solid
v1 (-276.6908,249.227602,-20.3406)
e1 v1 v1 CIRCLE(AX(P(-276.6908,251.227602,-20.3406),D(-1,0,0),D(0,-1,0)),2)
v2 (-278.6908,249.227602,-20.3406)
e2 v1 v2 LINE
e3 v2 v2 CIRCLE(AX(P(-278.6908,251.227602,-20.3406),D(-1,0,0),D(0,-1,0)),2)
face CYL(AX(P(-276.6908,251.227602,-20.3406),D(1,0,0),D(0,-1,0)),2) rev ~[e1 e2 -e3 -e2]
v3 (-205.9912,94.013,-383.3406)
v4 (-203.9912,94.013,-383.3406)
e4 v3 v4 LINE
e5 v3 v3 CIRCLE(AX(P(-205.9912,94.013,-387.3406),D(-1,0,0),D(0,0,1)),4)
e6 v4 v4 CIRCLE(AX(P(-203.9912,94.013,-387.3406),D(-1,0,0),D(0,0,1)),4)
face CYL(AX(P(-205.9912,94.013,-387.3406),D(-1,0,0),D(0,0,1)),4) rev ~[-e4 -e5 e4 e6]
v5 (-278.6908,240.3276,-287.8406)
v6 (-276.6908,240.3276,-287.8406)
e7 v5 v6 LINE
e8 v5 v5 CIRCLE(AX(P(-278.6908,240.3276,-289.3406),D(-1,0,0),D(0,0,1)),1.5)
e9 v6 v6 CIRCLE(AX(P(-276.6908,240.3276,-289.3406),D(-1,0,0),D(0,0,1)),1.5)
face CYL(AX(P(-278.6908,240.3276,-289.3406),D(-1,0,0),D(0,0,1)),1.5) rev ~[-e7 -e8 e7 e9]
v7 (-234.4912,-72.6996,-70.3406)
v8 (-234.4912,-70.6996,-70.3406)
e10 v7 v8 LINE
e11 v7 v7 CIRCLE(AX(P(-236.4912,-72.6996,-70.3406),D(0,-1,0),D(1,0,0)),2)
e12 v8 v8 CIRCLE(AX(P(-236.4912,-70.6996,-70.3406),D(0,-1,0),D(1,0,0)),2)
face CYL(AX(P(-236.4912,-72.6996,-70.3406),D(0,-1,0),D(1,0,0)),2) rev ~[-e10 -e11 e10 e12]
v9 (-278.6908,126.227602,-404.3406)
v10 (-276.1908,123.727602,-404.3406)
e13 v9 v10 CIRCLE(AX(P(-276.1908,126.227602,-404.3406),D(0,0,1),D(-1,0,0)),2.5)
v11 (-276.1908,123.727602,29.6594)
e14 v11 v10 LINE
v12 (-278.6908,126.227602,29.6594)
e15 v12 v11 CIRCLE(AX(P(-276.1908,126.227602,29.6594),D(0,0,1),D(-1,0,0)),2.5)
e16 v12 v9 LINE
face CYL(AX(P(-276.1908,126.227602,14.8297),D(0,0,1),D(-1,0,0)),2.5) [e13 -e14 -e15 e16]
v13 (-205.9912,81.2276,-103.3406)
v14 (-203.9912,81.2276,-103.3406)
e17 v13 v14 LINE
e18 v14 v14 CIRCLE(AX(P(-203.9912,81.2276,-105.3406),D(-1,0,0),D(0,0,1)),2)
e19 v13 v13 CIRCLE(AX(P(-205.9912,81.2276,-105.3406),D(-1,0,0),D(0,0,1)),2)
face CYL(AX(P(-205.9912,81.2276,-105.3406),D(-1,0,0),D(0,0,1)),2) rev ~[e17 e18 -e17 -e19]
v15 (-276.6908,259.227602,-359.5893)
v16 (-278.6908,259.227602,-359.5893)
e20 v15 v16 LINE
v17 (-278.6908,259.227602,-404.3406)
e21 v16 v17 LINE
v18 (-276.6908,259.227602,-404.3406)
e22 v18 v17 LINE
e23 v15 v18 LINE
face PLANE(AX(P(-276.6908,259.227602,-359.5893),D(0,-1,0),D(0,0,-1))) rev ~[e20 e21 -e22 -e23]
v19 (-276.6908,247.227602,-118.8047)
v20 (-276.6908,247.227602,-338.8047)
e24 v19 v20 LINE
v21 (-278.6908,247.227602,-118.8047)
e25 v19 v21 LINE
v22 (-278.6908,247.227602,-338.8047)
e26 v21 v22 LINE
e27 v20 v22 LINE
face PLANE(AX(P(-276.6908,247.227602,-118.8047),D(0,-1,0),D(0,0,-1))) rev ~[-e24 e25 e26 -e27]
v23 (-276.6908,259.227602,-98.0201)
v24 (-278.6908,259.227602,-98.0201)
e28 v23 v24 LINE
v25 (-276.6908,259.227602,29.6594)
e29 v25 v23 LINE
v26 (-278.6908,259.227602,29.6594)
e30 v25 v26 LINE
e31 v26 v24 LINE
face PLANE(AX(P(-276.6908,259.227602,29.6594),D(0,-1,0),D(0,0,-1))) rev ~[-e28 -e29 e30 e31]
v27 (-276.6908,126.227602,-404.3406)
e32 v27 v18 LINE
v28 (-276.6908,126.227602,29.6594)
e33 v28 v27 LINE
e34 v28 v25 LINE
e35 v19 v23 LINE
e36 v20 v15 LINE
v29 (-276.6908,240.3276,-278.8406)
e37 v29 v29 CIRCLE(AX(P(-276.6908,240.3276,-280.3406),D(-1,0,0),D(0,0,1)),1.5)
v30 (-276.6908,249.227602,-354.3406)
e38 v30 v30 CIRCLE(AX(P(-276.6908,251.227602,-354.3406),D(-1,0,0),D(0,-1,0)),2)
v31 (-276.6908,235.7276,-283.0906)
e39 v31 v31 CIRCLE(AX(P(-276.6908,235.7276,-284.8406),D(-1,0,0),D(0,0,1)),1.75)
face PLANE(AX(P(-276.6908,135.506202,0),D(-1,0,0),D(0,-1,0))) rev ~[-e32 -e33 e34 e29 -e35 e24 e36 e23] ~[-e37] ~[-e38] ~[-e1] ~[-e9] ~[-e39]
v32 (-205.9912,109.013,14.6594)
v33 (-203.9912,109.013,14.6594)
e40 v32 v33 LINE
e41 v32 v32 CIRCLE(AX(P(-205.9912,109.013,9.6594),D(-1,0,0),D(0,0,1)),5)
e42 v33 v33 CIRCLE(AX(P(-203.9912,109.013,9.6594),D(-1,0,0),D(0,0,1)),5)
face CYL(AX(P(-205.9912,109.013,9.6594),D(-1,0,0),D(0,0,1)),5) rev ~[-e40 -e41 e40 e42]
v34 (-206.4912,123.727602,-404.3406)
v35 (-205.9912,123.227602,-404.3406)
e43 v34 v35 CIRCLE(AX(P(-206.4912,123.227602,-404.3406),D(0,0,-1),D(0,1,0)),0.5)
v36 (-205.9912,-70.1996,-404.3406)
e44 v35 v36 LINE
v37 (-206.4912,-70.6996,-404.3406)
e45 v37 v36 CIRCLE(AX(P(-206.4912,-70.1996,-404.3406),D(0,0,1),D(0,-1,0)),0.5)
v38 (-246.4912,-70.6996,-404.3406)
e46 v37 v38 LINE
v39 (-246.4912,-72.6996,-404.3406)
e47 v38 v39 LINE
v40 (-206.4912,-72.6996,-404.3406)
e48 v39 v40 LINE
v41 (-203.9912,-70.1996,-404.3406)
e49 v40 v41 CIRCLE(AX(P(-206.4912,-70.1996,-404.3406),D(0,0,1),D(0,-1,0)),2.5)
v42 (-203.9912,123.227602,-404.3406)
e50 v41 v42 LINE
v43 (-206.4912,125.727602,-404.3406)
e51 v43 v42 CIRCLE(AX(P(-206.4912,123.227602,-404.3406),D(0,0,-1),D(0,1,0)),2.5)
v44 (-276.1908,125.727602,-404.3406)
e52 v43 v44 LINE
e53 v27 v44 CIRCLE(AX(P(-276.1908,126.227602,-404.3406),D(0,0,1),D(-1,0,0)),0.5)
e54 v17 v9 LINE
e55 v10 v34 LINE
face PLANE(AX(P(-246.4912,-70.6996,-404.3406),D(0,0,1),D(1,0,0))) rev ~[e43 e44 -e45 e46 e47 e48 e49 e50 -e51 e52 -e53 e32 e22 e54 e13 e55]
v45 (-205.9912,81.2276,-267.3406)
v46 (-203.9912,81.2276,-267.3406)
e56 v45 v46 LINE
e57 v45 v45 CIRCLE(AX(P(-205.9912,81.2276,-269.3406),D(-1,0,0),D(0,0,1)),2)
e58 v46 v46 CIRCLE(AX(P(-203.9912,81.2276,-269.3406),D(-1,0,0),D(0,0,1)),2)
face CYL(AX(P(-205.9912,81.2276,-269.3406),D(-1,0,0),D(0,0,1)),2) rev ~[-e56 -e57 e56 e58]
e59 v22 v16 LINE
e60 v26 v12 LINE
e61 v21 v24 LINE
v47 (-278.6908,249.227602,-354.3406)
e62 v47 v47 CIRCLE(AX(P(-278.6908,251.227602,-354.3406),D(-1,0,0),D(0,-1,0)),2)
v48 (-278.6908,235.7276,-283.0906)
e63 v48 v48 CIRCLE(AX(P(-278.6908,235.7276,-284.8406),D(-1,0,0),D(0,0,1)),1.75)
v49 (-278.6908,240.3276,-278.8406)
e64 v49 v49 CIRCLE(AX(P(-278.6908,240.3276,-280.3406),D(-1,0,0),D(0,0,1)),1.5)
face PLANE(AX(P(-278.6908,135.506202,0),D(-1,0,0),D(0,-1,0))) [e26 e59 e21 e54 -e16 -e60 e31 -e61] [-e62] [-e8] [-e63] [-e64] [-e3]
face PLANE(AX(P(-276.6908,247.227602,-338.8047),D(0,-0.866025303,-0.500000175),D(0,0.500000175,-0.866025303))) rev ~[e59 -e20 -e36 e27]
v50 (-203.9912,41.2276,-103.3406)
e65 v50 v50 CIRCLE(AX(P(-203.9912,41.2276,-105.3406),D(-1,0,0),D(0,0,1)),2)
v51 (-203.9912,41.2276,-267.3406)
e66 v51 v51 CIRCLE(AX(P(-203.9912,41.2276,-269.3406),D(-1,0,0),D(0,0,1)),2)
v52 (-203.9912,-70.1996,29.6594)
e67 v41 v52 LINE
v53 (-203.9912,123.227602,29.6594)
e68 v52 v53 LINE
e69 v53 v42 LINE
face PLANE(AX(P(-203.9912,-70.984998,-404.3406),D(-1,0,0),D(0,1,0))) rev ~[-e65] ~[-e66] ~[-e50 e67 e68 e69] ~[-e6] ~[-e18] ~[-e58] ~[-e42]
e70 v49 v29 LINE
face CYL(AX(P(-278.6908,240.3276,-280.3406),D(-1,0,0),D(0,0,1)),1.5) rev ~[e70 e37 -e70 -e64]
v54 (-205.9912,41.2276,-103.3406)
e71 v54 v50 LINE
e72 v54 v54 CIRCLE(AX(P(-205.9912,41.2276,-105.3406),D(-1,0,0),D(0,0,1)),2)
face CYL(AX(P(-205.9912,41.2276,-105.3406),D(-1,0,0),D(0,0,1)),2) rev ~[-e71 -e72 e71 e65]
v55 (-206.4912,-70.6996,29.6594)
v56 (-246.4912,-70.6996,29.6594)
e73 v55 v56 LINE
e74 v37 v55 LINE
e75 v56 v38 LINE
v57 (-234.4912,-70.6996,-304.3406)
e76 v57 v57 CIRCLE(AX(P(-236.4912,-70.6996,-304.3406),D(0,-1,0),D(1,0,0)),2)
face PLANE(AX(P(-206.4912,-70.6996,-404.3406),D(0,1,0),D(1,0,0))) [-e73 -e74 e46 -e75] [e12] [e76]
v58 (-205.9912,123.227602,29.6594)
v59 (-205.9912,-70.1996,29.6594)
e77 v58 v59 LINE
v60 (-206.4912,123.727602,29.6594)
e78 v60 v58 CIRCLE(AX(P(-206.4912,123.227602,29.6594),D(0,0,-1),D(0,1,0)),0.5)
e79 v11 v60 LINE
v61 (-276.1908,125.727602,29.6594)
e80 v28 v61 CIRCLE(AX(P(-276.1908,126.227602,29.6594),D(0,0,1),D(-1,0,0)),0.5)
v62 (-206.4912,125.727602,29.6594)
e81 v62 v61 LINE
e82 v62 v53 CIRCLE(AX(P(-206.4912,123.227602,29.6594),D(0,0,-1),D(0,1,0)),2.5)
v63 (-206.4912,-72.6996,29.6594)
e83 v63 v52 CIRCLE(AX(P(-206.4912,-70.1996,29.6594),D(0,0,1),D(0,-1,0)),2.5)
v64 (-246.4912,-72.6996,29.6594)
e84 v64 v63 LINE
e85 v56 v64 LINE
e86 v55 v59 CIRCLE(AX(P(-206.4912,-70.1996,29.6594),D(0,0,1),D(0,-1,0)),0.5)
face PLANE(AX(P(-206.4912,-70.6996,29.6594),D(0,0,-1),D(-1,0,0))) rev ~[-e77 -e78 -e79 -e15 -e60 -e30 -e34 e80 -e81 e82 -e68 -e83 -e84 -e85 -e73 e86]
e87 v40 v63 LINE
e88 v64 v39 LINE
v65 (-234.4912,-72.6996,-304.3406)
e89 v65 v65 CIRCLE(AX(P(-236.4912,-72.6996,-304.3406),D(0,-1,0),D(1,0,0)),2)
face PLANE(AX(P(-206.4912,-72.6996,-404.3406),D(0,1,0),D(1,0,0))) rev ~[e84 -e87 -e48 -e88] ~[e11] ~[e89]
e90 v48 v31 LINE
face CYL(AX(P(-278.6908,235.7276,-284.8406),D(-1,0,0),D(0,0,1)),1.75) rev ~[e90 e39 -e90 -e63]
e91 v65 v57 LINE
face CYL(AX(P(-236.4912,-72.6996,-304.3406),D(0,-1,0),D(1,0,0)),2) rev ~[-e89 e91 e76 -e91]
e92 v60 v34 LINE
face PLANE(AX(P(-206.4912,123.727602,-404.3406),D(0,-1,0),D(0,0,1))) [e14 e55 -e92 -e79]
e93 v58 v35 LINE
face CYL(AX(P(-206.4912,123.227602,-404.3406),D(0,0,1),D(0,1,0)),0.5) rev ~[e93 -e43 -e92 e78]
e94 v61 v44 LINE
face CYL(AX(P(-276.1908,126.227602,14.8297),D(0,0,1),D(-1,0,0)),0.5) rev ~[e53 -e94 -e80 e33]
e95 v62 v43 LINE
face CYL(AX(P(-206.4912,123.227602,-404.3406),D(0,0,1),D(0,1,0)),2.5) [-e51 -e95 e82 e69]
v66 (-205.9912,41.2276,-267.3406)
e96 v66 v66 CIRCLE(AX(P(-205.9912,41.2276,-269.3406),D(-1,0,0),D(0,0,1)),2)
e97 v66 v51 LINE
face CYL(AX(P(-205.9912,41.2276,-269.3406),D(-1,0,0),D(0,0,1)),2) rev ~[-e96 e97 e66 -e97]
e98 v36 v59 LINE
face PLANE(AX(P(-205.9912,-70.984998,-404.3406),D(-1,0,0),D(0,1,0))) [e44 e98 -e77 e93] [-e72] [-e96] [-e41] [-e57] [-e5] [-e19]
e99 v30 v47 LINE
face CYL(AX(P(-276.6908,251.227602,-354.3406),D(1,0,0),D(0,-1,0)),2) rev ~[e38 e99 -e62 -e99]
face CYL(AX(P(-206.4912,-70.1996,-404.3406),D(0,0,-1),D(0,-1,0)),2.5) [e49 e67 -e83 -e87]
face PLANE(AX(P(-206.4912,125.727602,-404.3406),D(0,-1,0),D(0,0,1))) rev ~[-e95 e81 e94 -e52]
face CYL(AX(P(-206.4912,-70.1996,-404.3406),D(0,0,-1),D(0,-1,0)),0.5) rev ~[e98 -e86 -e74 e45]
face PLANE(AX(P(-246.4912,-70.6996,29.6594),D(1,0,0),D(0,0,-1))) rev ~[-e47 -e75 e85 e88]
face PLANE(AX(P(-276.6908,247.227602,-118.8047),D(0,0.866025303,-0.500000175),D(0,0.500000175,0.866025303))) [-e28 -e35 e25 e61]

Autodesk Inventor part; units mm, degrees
ref_plane "YZ Plane" through (0, 0, 0) normal (1, 0, 0) x (0, 1, 0)
ref_plane "XZ Plane" through (0, 0, 0) normal (0, 1, 0) x (-1, 0, 0)
ref_plane "XY Plane" through (0, 0, 0) normal (0, 0, 1) x (1, 0, 0)
sketch "Boceto10" plane through (0, 0, 0) normal (0, 1, 0) x (-1, 0, 0)
  line L0 (9.2786, 29.6594) -> (9.2786, -404.3406)
  line L1 (9.2786, -404.3406) -> (-105.7214, -404.3406)
  line L2 (-105.7214, -404.3406) -> (-105.7214, 29.6594)
  line L3 (-105.7214, 29.6594) -> (9.2786, 29.6594)
  line L4 (-105.7214, 29.6594) -> (-123.7214, 29.6594)
  line L5 (-123.7214, -404.3406) -> (-105.7214, -404.3406)
  line L6 (9.2786, 29.6594) -> (79.7636, 29.6594)
  line L7 (79.7636, 29.6594) -> (79.7636, -404.3406)
  line L8 (79.7636, -404.3406) -> (9.2786, -404.3406)
  line L9 (-123.7214, 29.6594) -> (-123.7214, -98.0201)
  line L10 (-111.7214, -118.8047) -> (-111.7214, -338.8047)
  line L11 (-123.7214, 29.6594) -> (-123.7214, -98.0201)
  line L12 (-123.7214, -359.5893) -> (-123.7214, -404.3406)
  circle A0 centre (-115.7214, -20.3406) radius 2
  circle A1 centre (-115.7214, -354.3406) radius 2
  line L13 (-111.7214, -118.8047) -> (-123.7214, -98.0201)
  line L14 (-111.7214, -338.8047) -> (-123.7214, -359.5893)
  point P0 (0, 0)
  dimension "d65" = 434
  dimension "d66" = 115
  dimension "d67" = 18
  dimension "d76" = 70.485
  dimension "d77" = 434
  dimension "d108" = 220
  dimension "d125" = 4
  dimension "d126" = 8
  dimension "d127" = 50
  dimension "d128" = 4
  dimension "d129" = 8
  dimension "d130" = 50
  dimension "d133" = 18
  dimension "d166" = 12
extrude "Extrusión13" add sketch "Boceto10" along normal blind 2 contours L0 L1 L2 L3
extrude "Extrusión14" add sketch "Boceto10" along normal blind 2 contours L2 L5 L12 L14 L10 L13 L9 L4
extrude "Extrusión15" add sketch "Boceto10" along normal blind 2 contours L6 L7 L8 L0
bend part "Pieza de plegado2" radius 0.5 angle 90 line through (-9.2786, 0, 29.6594) along (0, 0, -1) centre toward (0, -1, 0) moving side (-1, 0, 0) both sides no
sketch "Boceto11" plane through (-11.7786, -70.1996, -404.3406) normal (-1, 0, 0) x (0, 0, 1)
  line L0 (0, 0) -> (434, 0) projected
  line L1 (434, 0) -> (434, -194.998)
  line L2 (434, -194.998) -> (0, -194.998)
  line L3 (0, -194.998) -> (0, 0)
  circle A0 centre (17, -30) radius 4
  circle A1 centre (414, -15) radius 5
  point P0 (404.3406, 70.1996)
  dimension "d82" = 194.998
  dimension "d158" = 8
  dimension "d159" = 10
  dimension "d161" = 17
  dimension "d162" = 20
  dimension "d164" = 15
  dimension "d165" = 30
extrude "Extrusión16" add sketch "Boceto11" against normal blind 2
bend part "Pieza de plegado3" radius 0.5 angle 90 line through (-11.7786, -70.1996, -404.3406) along (0, 0, 1) centre toward (-1, 0, 0) moving side (0, -1, 0) both sides no
sketch "Boceto14" plane through (-206.4912, -70.6996, -404.3406) normal (0, 1, 0) x (1, 0, 0)
  line L0 (0, 0) -> (0, -434) projected
  line L1 (0, -434) -> (-40, -434)
  line L2 (-40, -434) -> (-40, 0)
  line L3 (-40, 0) -> (0, 0)
  line L4 (0, -434) -> (194.2126, -434) projected
  line L5 (194.2126, 0) -> (0, 0) projected
  line L6 (0, -434) -> (0, 0)
  point P0 (206.4912, -404.3406)
  dimension "d91" = 40
  dimension "d92" = 434
extrude "Extrusión17" add sketch "Boceto14" against normal blind 2
bend part "Pieza de plegado4" radius 0.5 angle 90 line through (-206.4912, -70.6996, -404.3406) along (0, 0, 1) centre toward (0, 1, 0) moving side (1, 0, 0) both sides no
sketch "Boceto15" plane through (-246.4912, -72.6996, 29.6594) normal (0, -1, 0) x (1, 0, 0)
  line L0 (0, -434) -> (0, 0) projected
  line L1 (0, -434) -> (8.8, -434)
  line L2 (-29.6996, -434) -> (40, -434) projected
  circle A0 centre (10, -334) radius 2
  circle A1 centre (10, -100) radius 2
  point P0 (246.4912, -29.6594)
  dimension "d97" = 8.8
  dimension "d98" = 4
  dimension "d99" = 4
  dimension "d101" = 234
  dimension "d102" = 10
  dimension "d103" = 10
  dimension "d136" = 100
extrude "Extrusión18" cut sketch "Boceto15" against normal blind 10
sketch "Boceto16" plane through (-205.9912, -70.1996, 29.6594) normal (-1, 0, 0) x (0, 0, 1)
  circle A0 centre (-135, 111.4272) radius 2
  circle A1 centre (-299, 111.4272) radius 2
  line L0 (0, 193.4272) -> (-434, 193.4272) projected
  line L1 (0, 0) -> (0, 193.4272) projected
  line L2 (-434, 193.4272) -> (-434, 0) projected
  circle A2 centre (-135, 151.4272) radius 2
  circle A3 centre (-299, 151.4272) radius 2
  dimension "d109" = 4
  dimension "d111" = 4
  dimension "d113" = 82
  dimension "d114" = 135
  dimension "d116" = 82
  dimension "d117" = 135
  dimension "d137" = 4
  dimension "d138" = 40
  dimension "d139" = 4
  dimension "d140" = 40
extrude "Extrusión19" cut sketch "Boceto16" against normal blind 10
sketch "Boceto17" plane through (-278.6908, 126.2276, 29.6594) normal (-1, 0, 0) x (0, 0, 1)
  line L0 (0, 0) -> (0, 133) projected
  line L1 (0, 133) -> (-127.6795, 133) projected
  circle A0 centre (-319, 114.1) radius 1.5
  circle A1 centre (-310, 114.1) radius 1.5
  line L2 (-434, 133) -> (-434, 0) projected
  line L3 (-389.2487, 133) -> (-434, 133) projected
  circle A2 centre (-314.5, 109.5) radius 1.75
  point P0 (-29.6594, -126.2276)
  dimension "d148" = 3
  dimension "d149" = 3
  dimension "d150" = 115
  dimension "d151" = 18.9
  dimension "d152" = 9
  dimension "d153" = 18.9
  dimension "d154" = 3.5
  dimension "d156" = 4.6
  dimension "d157" = 4.5
extrude "Extrusión20" cut sketch "Boceto17" against normal blind 10
equation "\"d67\" = d133"
equation "\"d126\" = d129"
equation "\"d102\" = d103"
equation "\"d116\" = d113"
equation "\"d153\" = d151"
properties part number "Chapon" material "Aluminum 1100-H14"
